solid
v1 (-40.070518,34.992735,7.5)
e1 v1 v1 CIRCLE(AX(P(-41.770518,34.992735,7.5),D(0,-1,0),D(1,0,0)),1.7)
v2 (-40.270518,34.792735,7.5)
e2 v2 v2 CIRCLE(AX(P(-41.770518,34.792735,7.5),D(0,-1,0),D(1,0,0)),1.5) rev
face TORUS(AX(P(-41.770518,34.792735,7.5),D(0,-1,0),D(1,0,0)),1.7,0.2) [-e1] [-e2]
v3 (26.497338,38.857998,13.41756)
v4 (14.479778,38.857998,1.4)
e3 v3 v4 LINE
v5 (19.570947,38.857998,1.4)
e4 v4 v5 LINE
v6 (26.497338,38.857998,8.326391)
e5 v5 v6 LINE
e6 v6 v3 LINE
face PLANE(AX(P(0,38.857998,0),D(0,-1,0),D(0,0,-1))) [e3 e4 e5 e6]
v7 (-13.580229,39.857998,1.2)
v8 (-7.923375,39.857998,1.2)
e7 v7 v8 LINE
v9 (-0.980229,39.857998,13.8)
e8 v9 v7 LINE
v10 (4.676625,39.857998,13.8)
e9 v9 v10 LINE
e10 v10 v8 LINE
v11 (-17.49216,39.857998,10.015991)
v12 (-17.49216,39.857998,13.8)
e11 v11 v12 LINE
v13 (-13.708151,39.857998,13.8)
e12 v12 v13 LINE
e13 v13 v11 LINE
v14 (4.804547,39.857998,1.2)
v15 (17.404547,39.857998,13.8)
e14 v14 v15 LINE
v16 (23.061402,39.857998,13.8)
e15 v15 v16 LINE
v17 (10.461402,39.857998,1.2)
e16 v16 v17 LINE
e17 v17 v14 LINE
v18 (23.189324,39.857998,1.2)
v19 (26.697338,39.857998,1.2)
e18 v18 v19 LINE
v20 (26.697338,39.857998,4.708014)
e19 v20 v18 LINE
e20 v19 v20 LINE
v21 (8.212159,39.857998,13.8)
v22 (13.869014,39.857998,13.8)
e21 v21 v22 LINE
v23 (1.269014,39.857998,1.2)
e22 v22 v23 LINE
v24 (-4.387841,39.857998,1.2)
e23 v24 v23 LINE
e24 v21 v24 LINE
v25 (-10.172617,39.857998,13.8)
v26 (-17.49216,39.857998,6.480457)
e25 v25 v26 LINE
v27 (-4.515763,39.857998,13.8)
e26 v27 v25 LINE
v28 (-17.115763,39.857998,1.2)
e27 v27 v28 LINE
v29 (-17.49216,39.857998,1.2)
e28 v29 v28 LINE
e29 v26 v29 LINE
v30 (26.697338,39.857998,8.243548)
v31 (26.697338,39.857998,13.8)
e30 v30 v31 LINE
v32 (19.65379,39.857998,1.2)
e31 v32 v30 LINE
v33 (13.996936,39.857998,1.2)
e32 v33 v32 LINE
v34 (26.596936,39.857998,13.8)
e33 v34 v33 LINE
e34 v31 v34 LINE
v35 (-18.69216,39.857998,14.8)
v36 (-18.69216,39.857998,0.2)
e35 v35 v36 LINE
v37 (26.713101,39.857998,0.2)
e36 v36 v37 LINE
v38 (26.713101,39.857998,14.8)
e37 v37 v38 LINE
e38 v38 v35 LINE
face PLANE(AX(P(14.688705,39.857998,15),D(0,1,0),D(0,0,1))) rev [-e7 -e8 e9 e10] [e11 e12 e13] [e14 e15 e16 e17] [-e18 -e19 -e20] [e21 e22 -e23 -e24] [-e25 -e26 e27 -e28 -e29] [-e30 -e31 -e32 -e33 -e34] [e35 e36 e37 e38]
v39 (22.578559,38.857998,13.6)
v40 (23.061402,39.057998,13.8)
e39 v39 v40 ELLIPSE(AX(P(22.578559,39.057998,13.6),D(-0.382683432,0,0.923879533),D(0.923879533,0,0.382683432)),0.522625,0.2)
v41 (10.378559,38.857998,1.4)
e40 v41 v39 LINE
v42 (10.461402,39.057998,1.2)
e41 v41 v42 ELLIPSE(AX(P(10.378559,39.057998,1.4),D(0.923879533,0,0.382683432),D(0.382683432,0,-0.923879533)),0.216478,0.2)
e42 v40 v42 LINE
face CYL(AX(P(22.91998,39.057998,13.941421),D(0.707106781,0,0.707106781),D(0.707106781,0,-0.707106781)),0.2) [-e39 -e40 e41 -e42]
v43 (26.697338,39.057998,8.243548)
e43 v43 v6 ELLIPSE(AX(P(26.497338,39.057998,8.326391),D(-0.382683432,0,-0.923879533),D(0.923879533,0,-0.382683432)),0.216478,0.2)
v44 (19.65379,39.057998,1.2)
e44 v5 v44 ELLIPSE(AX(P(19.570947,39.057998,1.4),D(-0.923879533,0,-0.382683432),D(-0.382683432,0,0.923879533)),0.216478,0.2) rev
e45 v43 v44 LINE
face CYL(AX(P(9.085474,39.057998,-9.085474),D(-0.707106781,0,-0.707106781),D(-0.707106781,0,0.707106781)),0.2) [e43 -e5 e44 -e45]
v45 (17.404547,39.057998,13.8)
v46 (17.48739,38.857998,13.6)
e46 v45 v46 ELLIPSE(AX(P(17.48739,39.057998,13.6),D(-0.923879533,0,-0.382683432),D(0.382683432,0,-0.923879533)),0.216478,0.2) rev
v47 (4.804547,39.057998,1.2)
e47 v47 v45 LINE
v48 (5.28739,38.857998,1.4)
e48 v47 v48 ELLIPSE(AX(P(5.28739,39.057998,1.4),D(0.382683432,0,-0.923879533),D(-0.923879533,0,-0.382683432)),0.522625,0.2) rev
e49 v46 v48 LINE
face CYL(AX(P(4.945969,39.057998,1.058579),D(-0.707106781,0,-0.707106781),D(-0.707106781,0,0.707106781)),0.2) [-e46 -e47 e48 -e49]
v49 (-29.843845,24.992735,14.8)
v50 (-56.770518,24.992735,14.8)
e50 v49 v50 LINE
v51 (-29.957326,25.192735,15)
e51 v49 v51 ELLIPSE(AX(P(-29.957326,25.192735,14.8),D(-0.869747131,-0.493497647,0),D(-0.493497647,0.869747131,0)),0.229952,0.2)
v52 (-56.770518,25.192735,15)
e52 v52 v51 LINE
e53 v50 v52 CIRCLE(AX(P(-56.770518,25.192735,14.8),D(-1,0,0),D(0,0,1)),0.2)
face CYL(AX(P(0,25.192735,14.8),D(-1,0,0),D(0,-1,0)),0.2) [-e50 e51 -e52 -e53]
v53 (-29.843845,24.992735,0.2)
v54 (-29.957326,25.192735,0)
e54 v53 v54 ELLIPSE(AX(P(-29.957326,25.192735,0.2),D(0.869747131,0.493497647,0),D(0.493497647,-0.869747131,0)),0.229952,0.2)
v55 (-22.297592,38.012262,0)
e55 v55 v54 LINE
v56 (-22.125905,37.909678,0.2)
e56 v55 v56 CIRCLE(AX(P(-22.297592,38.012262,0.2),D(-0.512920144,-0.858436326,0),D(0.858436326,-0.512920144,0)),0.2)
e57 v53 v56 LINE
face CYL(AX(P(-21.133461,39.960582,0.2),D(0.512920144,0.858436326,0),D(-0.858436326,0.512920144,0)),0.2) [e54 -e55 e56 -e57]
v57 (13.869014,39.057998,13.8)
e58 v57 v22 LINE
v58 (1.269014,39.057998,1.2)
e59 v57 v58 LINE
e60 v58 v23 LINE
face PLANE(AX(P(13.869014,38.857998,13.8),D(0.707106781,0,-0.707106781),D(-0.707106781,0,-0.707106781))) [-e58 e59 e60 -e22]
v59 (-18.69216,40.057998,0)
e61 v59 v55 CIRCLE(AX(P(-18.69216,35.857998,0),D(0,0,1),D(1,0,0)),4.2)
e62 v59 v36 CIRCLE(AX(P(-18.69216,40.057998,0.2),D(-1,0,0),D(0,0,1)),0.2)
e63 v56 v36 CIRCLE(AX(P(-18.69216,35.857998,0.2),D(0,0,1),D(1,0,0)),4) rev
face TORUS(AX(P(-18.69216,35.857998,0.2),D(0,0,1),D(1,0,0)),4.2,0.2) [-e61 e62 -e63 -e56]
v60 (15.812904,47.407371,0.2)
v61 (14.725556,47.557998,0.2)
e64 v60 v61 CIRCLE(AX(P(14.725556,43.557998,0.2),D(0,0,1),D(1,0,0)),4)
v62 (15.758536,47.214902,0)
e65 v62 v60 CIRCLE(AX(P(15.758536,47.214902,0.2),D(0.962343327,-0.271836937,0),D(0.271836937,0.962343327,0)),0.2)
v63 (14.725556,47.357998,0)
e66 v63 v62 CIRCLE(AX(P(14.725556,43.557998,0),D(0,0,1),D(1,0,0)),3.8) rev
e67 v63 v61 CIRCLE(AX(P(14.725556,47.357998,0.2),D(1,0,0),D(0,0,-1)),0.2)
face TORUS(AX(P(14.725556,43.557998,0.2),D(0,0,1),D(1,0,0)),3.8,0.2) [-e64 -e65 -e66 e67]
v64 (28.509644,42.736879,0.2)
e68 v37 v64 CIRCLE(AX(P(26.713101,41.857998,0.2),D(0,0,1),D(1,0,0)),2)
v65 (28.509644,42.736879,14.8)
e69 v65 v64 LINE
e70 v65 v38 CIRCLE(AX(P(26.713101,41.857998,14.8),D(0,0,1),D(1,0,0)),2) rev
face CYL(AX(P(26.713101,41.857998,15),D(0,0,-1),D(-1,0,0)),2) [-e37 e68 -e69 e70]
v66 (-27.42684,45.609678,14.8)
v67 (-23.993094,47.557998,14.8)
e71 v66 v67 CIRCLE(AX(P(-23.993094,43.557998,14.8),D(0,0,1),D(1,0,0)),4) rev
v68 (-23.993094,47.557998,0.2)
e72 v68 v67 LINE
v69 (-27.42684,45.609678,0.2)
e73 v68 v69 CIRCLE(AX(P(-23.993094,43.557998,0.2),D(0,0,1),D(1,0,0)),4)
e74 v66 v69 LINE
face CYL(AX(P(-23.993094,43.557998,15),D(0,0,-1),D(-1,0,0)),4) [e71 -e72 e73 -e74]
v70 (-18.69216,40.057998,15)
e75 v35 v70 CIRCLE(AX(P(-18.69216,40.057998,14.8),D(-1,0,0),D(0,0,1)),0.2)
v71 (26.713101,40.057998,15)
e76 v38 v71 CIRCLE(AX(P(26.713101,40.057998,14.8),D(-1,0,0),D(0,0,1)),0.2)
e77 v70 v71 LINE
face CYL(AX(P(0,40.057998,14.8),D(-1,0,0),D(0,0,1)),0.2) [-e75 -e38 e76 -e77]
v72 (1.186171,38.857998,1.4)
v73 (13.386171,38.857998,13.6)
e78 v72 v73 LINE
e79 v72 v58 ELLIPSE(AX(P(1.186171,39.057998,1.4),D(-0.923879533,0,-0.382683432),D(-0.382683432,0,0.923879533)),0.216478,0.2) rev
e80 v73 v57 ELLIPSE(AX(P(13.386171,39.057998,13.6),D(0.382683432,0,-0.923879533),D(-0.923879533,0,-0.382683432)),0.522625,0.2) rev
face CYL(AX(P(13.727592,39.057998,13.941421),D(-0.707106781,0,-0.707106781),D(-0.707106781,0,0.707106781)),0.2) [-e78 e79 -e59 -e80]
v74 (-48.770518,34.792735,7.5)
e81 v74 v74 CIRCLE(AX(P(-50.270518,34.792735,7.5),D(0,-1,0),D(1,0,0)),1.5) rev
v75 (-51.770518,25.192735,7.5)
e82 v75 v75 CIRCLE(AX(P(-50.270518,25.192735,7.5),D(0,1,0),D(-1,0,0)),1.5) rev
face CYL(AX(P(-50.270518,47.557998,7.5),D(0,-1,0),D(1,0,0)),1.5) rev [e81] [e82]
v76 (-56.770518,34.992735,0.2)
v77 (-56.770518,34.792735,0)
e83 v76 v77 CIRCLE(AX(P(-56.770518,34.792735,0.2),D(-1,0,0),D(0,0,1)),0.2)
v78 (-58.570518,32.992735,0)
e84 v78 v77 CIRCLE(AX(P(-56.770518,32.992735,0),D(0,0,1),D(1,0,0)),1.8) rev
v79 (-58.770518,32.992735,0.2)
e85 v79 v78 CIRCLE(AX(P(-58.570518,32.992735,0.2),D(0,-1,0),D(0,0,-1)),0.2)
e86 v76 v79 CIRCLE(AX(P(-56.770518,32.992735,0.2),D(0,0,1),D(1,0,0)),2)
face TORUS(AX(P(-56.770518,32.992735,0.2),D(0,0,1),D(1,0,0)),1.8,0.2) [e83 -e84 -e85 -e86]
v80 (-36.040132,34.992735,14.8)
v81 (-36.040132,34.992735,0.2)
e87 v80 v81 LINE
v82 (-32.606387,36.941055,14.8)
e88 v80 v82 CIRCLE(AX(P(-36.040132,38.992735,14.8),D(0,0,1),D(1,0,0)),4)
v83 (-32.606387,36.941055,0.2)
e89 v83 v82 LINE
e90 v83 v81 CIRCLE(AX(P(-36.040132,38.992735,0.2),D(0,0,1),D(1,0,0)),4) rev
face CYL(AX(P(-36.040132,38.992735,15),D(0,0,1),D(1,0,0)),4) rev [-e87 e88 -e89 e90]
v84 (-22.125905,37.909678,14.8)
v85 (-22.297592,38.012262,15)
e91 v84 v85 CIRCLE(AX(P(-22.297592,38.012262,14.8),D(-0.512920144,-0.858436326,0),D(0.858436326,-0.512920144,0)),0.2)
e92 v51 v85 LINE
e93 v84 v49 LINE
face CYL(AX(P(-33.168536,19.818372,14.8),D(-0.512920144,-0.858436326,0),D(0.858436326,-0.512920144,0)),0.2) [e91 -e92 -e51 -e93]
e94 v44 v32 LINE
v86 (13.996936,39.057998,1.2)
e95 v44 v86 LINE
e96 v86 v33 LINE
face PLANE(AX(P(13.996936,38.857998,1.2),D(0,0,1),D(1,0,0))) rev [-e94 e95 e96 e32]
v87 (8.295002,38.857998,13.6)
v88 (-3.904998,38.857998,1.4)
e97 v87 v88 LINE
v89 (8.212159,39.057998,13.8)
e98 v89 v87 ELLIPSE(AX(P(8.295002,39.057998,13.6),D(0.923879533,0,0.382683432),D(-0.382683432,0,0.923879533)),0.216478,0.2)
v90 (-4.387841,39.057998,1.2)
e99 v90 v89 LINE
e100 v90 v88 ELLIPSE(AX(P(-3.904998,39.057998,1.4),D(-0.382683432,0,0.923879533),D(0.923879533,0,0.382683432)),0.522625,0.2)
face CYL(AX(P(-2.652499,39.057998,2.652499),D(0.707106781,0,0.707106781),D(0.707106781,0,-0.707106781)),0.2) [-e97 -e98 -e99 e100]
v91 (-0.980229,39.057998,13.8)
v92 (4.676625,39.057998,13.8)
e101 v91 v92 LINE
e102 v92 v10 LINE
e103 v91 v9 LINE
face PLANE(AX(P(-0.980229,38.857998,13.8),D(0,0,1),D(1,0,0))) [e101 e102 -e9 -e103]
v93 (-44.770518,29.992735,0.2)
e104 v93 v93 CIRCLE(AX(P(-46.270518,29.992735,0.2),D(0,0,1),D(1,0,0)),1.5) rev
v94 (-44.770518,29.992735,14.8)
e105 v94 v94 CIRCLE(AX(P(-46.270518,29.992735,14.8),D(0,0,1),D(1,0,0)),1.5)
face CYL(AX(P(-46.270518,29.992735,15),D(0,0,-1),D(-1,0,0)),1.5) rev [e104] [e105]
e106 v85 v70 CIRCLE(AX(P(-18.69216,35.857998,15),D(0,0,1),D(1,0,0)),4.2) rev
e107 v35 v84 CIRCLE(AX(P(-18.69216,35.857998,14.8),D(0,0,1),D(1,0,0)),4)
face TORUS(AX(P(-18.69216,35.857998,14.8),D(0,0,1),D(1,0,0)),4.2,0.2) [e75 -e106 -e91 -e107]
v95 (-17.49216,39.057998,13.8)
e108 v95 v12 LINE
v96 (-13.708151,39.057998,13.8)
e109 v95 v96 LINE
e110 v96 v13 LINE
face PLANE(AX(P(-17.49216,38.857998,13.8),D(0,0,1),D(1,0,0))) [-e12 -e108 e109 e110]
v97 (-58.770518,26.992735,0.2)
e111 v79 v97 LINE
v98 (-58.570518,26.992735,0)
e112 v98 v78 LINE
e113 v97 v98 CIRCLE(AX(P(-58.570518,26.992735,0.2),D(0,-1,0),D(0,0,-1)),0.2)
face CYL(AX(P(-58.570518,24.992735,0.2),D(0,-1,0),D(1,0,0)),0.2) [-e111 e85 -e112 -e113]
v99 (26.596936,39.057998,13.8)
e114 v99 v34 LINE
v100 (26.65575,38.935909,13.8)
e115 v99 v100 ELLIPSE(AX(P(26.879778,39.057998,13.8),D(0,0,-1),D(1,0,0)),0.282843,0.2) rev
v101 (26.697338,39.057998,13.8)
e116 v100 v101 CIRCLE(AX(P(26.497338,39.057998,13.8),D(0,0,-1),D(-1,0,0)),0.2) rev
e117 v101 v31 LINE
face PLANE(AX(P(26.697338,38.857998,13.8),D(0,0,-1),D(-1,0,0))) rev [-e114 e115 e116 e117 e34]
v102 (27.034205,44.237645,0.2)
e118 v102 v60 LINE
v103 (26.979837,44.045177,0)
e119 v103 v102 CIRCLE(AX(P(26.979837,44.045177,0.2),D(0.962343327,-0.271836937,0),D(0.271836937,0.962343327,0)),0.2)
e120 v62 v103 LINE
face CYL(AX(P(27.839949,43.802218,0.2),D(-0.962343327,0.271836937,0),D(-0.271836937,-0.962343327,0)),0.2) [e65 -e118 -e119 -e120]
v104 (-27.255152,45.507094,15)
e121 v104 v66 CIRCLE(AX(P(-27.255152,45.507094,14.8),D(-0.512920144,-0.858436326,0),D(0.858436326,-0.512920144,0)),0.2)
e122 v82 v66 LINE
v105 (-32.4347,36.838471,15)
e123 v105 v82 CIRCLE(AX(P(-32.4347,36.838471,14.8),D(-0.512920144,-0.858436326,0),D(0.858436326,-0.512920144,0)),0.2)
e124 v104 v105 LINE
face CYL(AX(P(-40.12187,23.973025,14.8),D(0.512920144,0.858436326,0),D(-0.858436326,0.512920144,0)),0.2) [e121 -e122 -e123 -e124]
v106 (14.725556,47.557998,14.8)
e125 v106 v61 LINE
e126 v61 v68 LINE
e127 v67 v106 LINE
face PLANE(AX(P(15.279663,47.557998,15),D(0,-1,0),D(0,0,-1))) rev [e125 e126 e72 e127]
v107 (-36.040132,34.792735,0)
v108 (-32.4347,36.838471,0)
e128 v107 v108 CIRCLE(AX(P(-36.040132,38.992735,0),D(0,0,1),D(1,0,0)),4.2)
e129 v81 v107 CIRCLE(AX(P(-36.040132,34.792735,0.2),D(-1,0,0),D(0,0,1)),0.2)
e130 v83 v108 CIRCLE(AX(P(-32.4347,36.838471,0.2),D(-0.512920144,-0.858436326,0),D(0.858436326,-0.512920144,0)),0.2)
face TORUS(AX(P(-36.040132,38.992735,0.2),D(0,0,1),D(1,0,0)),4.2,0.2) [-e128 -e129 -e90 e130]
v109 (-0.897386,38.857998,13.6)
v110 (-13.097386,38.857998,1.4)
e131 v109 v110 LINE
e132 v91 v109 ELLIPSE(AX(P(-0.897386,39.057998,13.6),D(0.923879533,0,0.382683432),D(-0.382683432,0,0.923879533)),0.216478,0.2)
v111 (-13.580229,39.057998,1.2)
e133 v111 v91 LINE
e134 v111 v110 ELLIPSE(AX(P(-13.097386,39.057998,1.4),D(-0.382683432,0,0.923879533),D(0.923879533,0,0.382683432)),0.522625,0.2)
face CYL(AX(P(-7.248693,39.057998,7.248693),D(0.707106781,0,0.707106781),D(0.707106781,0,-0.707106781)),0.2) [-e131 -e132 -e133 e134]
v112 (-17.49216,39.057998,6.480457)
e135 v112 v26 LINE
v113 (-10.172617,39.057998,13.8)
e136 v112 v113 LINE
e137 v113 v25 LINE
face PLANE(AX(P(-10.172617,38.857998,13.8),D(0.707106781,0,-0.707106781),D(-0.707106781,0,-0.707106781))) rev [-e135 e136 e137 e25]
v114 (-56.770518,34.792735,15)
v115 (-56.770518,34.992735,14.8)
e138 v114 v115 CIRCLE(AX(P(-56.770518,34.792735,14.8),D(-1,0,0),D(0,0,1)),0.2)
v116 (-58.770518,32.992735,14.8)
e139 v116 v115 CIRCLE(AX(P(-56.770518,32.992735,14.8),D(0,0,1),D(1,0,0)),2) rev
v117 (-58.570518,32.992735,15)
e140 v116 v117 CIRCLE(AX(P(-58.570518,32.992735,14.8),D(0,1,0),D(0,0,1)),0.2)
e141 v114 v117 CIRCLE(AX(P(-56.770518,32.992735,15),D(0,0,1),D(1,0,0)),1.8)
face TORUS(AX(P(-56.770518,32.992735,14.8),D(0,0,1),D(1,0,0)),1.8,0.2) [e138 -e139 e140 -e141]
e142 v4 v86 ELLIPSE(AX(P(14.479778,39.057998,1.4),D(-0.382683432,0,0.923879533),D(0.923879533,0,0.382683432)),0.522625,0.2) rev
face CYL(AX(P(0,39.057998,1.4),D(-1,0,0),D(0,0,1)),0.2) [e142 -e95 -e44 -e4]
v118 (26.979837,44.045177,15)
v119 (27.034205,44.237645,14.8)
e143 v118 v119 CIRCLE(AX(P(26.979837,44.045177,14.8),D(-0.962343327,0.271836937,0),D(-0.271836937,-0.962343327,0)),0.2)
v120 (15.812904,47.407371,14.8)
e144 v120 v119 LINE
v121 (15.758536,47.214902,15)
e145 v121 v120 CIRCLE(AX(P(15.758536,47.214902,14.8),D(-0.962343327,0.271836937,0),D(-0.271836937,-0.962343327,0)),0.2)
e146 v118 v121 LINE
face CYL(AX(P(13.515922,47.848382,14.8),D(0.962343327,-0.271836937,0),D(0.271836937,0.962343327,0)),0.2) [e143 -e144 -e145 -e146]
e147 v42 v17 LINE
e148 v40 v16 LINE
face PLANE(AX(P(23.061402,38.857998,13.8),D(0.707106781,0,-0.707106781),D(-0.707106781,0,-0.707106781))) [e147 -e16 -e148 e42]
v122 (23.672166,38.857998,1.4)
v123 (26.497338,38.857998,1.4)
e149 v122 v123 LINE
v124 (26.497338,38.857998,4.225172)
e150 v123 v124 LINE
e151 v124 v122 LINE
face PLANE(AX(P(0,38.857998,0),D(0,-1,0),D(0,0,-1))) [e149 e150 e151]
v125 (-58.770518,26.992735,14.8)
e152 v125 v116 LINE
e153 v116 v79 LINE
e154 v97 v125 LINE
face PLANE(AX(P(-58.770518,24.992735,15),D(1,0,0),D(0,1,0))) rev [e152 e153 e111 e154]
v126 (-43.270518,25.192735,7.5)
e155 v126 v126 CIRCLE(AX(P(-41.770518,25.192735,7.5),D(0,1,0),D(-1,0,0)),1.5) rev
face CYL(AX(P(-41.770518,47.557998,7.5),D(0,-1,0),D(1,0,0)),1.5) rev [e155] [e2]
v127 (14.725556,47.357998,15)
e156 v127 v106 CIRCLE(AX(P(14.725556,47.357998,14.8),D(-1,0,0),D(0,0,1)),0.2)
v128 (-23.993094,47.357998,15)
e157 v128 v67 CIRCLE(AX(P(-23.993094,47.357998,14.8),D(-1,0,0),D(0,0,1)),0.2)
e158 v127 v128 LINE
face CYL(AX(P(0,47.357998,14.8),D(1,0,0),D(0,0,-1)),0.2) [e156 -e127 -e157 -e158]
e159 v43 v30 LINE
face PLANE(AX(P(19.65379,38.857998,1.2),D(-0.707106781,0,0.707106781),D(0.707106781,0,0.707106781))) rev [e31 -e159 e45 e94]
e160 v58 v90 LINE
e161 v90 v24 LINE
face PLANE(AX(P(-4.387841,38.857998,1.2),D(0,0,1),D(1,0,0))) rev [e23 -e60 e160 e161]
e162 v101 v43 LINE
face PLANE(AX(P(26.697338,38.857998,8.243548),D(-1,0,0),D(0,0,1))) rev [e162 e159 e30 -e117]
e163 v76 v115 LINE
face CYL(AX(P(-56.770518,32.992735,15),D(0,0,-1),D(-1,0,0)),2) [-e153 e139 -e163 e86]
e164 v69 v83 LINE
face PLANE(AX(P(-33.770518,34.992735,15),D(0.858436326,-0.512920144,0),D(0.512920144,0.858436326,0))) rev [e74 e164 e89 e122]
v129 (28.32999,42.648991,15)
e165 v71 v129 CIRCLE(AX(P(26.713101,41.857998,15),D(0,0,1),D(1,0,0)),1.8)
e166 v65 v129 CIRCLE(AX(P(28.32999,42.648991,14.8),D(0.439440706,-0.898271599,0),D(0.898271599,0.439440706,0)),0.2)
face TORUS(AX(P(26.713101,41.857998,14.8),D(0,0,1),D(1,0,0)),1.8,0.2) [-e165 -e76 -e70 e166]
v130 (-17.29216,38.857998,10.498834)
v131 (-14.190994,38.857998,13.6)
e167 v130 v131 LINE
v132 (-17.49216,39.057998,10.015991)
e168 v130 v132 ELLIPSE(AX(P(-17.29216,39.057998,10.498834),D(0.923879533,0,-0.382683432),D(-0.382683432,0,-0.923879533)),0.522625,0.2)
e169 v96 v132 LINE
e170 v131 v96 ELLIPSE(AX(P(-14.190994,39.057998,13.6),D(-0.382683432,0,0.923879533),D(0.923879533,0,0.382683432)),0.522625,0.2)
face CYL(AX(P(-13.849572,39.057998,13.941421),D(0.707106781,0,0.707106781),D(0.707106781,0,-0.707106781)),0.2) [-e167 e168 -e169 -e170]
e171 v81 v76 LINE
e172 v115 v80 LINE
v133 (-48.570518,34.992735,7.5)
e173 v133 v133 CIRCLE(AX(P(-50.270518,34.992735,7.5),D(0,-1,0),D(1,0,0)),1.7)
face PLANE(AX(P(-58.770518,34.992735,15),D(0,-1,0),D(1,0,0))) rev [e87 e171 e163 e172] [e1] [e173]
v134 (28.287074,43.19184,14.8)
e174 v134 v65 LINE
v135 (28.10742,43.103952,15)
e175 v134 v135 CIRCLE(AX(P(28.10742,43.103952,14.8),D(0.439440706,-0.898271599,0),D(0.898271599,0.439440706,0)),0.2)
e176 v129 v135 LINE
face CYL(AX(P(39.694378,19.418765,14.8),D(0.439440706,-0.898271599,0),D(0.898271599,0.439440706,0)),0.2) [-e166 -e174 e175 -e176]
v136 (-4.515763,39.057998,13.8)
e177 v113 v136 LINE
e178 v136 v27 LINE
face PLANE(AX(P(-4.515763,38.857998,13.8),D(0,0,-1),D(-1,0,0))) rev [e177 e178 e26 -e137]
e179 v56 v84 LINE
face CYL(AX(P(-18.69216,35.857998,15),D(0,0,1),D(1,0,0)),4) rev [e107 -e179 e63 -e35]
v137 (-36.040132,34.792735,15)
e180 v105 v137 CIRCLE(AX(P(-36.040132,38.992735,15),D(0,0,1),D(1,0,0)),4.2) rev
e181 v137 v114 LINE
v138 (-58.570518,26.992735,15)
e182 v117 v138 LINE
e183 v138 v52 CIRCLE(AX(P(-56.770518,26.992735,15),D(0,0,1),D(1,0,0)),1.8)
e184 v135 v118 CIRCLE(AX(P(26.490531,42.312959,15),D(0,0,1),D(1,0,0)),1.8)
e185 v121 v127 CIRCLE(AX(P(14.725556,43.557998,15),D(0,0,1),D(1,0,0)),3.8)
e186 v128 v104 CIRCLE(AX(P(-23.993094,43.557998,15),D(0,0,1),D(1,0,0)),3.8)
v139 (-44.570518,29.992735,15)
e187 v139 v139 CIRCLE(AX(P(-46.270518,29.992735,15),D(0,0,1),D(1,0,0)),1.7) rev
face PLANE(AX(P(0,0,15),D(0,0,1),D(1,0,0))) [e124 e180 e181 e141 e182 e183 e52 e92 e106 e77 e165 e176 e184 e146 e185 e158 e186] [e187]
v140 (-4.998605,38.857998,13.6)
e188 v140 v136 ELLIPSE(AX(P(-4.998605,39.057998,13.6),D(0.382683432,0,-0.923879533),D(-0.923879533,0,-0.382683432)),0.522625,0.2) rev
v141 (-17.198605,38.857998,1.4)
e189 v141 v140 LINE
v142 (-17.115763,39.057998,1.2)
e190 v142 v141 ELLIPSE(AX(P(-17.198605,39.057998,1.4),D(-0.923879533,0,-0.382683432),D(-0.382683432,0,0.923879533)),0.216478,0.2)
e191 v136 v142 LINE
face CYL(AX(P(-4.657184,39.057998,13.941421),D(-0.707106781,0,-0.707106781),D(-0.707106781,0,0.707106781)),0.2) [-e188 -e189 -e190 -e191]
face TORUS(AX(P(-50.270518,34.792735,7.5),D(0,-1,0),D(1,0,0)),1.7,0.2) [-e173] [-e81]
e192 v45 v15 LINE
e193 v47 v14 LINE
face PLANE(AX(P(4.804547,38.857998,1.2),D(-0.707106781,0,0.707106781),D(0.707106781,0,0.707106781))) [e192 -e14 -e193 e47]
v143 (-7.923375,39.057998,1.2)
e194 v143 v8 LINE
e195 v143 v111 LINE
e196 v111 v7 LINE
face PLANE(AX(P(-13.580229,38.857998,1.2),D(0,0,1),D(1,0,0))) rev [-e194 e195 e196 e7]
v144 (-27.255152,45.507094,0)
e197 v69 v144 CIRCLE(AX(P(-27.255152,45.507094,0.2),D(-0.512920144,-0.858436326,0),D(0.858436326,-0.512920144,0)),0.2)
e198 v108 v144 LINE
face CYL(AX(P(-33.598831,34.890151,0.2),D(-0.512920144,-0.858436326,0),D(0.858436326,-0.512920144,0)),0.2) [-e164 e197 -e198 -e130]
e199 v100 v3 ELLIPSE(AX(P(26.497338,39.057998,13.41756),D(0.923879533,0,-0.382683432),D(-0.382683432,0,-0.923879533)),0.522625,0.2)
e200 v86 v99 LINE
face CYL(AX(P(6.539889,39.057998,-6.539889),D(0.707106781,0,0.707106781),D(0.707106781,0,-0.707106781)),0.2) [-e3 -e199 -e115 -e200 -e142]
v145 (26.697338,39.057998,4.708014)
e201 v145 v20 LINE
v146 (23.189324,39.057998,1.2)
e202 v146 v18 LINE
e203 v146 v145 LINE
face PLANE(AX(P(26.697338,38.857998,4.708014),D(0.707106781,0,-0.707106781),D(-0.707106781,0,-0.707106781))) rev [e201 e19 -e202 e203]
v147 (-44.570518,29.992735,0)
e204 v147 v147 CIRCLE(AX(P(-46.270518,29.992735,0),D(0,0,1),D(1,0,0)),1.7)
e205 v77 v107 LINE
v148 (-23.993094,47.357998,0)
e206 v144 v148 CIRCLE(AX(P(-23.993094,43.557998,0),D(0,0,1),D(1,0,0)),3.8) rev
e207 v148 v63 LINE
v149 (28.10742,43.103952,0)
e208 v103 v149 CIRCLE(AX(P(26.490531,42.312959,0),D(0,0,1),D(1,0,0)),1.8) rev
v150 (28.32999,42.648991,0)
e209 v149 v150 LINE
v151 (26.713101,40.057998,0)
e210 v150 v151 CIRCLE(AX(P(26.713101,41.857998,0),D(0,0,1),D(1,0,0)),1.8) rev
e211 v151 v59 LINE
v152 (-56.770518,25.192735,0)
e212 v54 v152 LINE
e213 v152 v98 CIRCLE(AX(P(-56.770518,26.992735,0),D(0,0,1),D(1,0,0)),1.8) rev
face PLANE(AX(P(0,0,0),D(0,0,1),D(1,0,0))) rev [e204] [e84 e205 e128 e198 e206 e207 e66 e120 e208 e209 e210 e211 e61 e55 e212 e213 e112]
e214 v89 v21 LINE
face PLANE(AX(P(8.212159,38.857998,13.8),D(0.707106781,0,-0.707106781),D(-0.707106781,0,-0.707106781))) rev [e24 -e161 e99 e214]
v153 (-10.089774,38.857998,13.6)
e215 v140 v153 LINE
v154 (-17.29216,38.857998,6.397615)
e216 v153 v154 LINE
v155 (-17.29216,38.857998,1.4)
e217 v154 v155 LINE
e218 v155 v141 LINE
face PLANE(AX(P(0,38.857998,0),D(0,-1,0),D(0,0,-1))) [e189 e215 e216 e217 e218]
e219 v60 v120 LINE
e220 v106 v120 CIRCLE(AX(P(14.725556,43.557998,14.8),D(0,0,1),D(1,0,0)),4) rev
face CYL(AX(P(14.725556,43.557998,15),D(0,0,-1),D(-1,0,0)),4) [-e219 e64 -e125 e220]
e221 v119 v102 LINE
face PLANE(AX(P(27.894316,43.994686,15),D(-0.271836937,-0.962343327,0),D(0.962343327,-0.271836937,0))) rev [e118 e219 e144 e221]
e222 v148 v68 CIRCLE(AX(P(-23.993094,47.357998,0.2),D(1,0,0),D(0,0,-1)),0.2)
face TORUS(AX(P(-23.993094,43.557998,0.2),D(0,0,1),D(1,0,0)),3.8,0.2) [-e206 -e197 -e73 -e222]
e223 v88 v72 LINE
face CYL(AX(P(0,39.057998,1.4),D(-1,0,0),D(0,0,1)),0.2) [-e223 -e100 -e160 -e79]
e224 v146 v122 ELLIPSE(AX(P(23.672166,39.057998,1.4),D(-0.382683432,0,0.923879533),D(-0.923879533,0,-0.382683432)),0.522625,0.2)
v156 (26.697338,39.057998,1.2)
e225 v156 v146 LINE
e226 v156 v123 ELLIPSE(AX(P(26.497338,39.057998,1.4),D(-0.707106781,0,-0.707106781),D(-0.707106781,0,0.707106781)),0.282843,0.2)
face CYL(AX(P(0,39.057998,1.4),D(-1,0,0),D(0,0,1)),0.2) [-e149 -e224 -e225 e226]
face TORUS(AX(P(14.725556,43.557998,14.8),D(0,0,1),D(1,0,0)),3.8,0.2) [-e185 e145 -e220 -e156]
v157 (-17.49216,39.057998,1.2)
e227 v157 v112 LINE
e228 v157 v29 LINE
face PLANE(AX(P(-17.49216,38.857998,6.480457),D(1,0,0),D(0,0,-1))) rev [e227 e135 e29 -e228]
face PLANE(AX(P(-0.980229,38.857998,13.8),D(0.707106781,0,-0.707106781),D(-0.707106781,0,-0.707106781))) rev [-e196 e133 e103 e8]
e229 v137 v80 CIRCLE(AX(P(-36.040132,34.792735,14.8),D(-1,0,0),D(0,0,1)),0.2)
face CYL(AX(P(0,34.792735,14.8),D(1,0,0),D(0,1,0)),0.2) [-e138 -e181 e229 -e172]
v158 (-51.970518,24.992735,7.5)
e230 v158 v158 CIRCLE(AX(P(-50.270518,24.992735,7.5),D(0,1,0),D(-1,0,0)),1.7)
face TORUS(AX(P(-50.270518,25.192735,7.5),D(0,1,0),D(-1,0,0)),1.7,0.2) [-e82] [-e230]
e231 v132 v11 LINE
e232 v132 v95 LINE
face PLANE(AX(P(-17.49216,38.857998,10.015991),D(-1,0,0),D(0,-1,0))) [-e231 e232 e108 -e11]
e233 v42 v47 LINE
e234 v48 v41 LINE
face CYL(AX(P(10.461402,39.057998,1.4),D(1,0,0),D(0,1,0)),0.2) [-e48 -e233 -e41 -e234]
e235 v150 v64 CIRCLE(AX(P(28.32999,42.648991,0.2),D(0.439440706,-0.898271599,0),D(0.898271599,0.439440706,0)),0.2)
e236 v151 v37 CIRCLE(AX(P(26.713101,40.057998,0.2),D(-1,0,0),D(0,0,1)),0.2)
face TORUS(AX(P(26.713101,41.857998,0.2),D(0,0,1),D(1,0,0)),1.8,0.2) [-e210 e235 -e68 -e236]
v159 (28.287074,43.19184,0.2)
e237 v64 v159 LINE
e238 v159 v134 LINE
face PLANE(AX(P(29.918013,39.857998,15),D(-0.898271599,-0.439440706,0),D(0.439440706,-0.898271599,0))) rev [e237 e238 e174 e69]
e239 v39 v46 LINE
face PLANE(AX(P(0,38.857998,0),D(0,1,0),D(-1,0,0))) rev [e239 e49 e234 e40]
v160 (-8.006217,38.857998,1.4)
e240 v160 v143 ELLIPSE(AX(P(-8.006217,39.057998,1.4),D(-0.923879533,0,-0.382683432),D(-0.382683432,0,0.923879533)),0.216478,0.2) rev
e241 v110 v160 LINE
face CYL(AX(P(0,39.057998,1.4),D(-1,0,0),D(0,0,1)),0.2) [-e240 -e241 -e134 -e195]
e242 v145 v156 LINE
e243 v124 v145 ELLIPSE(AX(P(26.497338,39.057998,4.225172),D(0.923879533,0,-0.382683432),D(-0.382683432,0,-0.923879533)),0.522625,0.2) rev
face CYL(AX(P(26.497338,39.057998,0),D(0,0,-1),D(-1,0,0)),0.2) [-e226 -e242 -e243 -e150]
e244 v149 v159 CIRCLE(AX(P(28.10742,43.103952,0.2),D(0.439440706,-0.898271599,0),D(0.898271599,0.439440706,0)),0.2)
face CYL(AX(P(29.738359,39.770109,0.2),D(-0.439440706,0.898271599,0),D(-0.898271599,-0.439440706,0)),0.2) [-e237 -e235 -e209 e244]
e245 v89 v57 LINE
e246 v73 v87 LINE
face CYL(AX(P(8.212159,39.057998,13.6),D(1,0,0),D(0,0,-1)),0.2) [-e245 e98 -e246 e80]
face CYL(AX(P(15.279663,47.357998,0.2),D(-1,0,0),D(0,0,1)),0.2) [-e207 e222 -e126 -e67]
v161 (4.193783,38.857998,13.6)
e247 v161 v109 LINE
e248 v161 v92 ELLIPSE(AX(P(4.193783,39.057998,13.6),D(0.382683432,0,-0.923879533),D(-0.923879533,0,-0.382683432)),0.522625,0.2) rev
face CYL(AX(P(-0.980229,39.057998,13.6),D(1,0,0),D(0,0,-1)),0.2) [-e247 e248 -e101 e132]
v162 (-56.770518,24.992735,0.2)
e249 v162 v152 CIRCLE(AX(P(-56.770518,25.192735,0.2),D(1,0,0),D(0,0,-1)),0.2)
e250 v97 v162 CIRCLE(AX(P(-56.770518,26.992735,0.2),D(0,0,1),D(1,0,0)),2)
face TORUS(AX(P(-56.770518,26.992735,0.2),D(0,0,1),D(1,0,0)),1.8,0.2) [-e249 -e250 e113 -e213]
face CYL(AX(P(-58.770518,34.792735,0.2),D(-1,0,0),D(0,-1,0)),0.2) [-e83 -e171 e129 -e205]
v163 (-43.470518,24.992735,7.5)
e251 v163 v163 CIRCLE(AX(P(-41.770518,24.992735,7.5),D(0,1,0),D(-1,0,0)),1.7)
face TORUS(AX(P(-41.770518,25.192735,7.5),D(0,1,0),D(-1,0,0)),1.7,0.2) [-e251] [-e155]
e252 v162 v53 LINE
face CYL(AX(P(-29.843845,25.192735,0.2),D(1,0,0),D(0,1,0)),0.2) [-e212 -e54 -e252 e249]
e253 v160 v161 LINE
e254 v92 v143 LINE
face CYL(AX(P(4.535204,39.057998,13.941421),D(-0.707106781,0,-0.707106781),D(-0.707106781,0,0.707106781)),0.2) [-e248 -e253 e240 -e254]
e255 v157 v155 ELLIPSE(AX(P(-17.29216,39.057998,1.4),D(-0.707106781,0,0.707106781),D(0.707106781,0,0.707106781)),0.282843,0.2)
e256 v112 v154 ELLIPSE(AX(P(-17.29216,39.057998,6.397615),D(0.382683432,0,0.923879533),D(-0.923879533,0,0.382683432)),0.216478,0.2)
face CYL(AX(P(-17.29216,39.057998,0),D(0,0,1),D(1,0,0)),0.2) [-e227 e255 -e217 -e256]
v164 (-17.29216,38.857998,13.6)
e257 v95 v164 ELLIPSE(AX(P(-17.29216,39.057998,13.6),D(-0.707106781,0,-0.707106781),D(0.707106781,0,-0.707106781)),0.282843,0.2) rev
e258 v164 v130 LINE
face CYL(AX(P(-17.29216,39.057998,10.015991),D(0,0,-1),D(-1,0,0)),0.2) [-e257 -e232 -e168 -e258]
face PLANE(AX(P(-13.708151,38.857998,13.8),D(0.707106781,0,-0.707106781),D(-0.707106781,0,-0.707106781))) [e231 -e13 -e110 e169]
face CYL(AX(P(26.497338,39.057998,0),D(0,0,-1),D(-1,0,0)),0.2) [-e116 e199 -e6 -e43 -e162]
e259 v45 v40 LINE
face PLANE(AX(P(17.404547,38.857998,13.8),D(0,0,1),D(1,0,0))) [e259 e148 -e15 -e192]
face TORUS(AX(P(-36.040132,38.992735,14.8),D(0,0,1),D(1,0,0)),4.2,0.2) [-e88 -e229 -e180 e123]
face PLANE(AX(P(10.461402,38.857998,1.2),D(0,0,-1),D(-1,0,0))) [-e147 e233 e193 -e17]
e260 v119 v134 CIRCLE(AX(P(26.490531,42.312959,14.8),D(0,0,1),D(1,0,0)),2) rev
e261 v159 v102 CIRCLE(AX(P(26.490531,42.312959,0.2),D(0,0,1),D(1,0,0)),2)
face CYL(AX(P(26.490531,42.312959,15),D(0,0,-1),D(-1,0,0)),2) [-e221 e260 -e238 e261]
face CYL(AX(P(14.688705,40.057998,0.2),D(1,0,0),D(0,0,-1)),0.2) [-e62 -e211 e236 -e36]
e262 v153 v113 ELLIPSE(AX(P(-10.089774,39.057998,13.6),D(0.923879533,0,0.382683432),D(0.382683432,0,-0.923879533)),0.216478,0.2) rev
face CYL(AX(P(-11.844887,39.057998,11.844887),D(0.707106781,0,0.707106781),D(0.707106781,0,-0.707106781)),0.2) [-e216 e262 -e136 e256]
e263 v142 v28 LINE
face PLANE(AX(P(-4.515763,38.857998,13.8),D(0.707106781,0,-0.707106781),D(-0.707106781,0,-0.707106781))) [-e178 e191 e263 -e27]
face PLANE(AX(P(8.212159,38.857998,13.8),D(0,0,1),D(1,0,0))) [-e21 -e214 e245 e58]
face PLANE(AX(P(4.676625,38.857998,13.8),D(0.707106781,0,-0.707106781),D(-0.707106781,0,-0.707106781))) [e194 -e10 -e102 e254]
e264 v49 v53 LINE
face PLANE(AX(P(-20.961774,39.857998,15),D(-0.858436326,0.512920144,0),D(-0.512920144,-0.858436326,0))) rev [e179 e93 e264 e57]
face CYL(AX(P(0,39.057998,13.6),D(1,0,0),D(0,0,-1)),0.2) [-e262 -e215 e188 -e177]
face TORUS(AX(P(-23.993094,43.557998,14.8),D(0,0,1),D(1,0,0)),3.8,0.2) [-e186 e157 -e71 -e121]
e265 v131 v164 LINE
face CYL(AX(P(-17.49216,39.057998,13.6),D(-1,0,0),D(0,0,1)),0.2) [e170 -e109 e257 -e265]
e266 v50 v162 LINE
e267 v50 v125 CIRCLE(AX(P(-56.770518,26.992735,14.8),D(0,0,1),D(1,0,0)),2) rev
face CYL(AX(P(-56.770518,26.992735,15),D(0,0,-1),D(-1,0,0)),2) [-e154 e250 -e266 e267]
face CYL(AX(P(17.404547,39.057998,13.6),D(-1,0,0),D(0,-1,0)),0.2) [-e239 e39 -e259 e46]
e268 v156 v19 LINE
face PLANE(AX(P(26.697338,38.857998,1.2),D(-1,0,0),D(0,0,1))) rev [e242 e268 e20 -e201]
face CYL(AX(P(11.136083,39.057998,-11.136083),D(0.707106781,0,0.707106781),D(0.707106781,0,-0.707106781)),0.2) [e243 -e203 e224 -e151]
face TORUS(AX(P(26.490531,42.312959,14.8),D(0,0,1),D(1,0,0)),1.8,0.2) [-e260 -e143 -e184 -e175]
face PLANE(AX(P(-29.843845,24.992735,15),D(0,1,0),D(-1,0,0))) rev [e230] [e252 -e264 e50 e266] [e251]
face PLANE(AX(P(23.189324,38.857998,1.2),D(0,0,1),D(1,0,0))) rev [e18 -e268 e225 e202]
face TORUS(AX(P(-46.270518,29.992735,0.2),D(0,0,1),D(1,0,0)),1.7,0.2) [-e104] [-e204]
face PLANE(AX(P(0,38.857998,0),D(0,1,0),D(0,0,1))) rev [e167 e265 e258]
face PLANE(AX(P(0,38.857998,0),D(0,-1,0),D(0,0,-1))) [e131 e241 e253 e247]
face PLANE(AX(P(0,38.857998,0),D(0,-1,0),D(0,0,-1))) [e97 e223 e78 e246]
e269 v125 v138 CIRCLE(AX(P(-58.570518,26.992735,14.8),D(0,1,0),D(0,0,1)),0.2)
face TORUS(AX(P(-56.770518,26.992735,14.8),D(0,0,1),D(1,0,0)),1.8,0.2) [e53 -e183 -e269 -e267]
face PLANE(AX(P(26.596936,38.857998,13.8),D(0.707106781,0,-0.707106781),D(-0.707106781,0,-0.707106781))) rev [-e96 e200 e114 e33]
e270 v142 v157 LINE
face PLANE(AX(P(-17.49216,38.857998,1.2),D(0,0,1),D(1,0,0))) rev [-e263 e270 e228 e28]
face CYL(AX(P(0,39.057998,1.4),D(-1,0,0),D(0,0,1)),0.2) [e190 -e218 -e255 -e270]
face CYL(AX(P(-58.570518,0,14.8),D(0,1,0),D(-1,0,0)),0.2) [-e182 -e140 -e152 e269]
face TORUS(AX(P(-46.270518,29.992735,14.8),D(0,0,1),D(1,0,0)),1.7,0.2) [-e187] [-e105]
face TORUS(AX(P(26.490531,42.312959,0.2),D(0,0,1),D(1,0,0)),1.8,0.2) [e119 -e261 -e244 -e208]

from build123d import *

# Parameters (mm, degrees)
ESQUISSE1_R             = 1.5
BOSS_EXTRU_1_DEPTH      = 15
CONG_1_R                = 2
CONG_3_R                = 4
CONG_5_R                = 4
CONG_6_R                = 2
ESQUISSE2_R             = 1.5
ENL_V_MAT_EXTRU_2_DEPTH = 65.716032438
CONG_8_R                = 0.2
BOSS_EXTRU_2_DEPTH      = 1
CONG_10_R               = 0.2
CONG_11_R               = 0.2
CONG_12_R               = 0.2


with BuildPart() as part:
    # Esquisse1 → Boss.-Extru.1 (new body)
    with BuildSketch(Plane.XY):
        Polygon((-20.961773966, 39.857997612), (14.688705186, 39.857997612), (29.918012986, 39.857997612), (27.8943161, 43.99468639), (15.279662568, 47.557997612), (-26.262708646, 47.557997612), (-33.770517971, 34.992735109), (-58.770517971, 34.992735109), (-58.770517971, 24.992735109), (-29.843845186, 24.992735109), align=None)
        with Locations((-46.270517971, 29.992735109)):
            Circle(ESQUISSE1_R, mode=Mode.SUBTRACT)
    extrude(amount=BOSS_EXTRU_1_DEPTH)

    # Congé1
    cong_1_edges = [part.edges().sort_by_distance(p)[0] for p in [
        (27.8943161, 43.99468639, 7.5),
        (29.918012986, 39.857997612, 7.5),
    ]]
    fillet(cong_1_edges, radius=CONG_1_R)

    # Congé3
    cong_3_edges = [part.edges().sort_by_distance(p)[0] for p in [
        (-20.961773966, 39.857997612, 7.5),
    ]]
    fillet(cong_3_edges, radius=CONG_3_R)

    # Congé5
    cong_5_edges = [part.edges().sort_by_distance(p)[0] for p in [
        (-26.262708646, 47.557997612, 7.5),
        (15.279662568, 47.557997612, 7.5),
        (-33.770517971, 34.992735109, 7.5),
    ]]
    fillet(cong_5_edges, radius=CONG_5_R)

    # Congé6
    cong_6_edges = [part.edges().sort_by_distance(p)[0] for p in [
        (-58.770517971, 24.992735109, 7.5),
        (-58.770517971, 34.992735109, 7.5),
    ]]
    fillet(cong_6_edges, radius=CONG_6_R)

    # Esquisse2 → Enlèv. mat.-Extru.2 (cut, through all)
    with BuildSketch(Plane.XZ.offset(-24.992735109)):
        with Locations((-50.270517971, 7.5)):
            Circle(ESQUISSE2_R)
        with Locations((-41.770517971, 7.5)):
            Circle(ESQUISSE2_R)
    extrude(amount=-ENL_V_MAT_EXTRU_2_DEPTH, mode=Mode.SUBTRACT)

    # Congé8
    cong_8_edges = [part.edges().sort_by_distance(p)[0] for p in [
        (-51.770517971, 34.992735109, 7.5),
        (-51.770517971, 24.992735109, 7.5),
        (-43.270517971, 34.992735109, 7.5),
        (-43.270517971, 24.992735109, 7.5),
    ]]
    fillet(cong_8_edges, radius=CONG_8_R)

    # Esquisse3 → Boss.-Extru.2 (add)
    with BuildSketch(Plane.XZ.offset(-39.857997612)):
        Polygon((-4.51576278, 13.8), (-10.17261703, 13.8), (-17.492159594, 6.480457436), (-17.492159594, 1.2), (-17.11576278, 1.2), align=None)
        Polygon((-0.980228874, 13.8), (4.676625375, 13.8), (-7.923374625, 1.2), (-13.580228874, 1.2), align=None)
        Polygon((8.212159281, 13.8), (13.869013531, 13.8), (1.269013531, 1.2), (-4.387840719, 1.2), align=None)
        Polygon((17.404547437, 13.8), (23.061401686, 13.8), (10.461401686, 1.2), (4.804547437, 1.2), align=None)
        Polygon((26.596935592, 13.8), (13.996935592, 1.2), (19.653789841, 1.2), (26.69733819, 8.243548348), (26.69733819, 13.8), align=None)
        Polygon((26.69733819, 4.708014442), (23.189323747, 1.2), (26.69733819, 1.2), align=None)
        Polygon((-13.708150936, 13.8), (-17.492159594, 10.015991342), (-17.492159594, 13.8), align=None)
    extrude(amount=BOSS_EXTRU_2_DEPTH)

    # Congé10
    cong_10_edges = [part.edges().sort_by_distance(p)[0] for p in [
        (-47.770517971, 29.992735109, 0),
        (-47.770517971, 29.992735109, 15),
    ]]
    fillet(cong_10_edges, radius=CONG_10_R)

    # Congé11
    cong_11_edges = [part.edges().sort_by_distance(p)[0] for p in [
        (-25.984875042, 31.451206648, 0),
        (-25.984875042, 31.451206648, 15),
        (28.39835911, 42.964359626, 0),
        (28.39835911, 42.964359626, 15),
        (21.423554114, 45.822508196, 0),
        (27.772163037, 43.848347647, 0),
        (28.409827678, 40.799168737, 0),
        (21.423554114, 45.822508196, 15),
        (27.772163037, 43.848347647, 15),
        (28.409827678, 40.799168737, 15),
        (4.010470704, 39.857997612, 0),
        (4.010470704, 39.857997612, 15),
        (-20.666150183, 39.336986136, 0),
        (-20.666150183, 39.336986136, 15),
        (-46.405325158, 34.992735109, 0),
        (-46.405325158, 34.992735109, 15),
        (-30.016613309, 41.27536636, 0),
        (-30.016613309, 41.27536636, 15),
        (-4.633769244, 47.557997612, 0),
        (-4.633769244, 47.557997612, 15),
        (-25.967084863, 47.036986136, 0),
        (15.274421325, 47.520161998, 0),
        (-25.967084863, 47.036986136, 15),
        (15.274421325, 47.520161998, 15),
        (-34.066141755, 35.513746584, 0),
        (-34.066141755, 35.513746584, 15),
        (-43.307181579, 24.992735109, 0),
        (-43.307181579, 24.992735109, 15),
        (-58.770517971, 29.992735109, 0),
        (-58.184731534, 34.406948671, 0),
        (-58.184731534, 25.578521546, 0),
        (-58.770517971, 29.992735109, 15),
        (-58.184731534, 34.406948671, 15),
        (-58.184731534, 25.578521546, 15),
    ]]
    fillet(cong_11_edges, radius=CONG_11_R)

    # Congé12
    # the kernel refuses this fillet: 0.2 mm, written as the material it takes off along each edge
    with BuildSketch(Plane(origin=(7.712159281, 38.857997612, 13.8), x_dir=(0, 1, 0), z_dir=(1, 0, 0)), Plane(origin=(-1.480228874, 38.857997612, 13.8), x_dir=(0, 1, 0), z_dir=(1, 0, 0)), Plane(origin=(16.904547437, 38.857997612, 13.8), x_dir=(0, 1, 0), z_dir=(1, 0, 0)), Plane(origin=(10.961401686, 38.857997612, 1.2), x_dir=(0, 1, 0), z_dir=(-1, 0, 0)), Plane(origin=(1.769013531, 38.857997612, 1.2), x_dir=(0, 1, 0), z_dir=(-1, 0, 0)), Plane(origin=(-7.423374625, 38.857997612, 1.2), x_dir=(0, 1, 0), z_dir=(-1, 0, 0))) as cong_12_piece_1:
        with BuildLine():
            CenterArc((CONG_12_R, -CONG_12_R), CONG_12_R, 90, 90)
            Line((0, -CONG_12_R), (0, 0))
            Line((0, 0), (CONG_12_R, 0))
        make_face()
    extrude(amount=6.656854249, mode=Mode.SUBTRACT)
    with BuildSketch(Plane(origin=(14.222566921, 38.857997612, 14.153553391), x_dir=(0, 1, 0), z_dir=(-0.7071067811865435, 0, -0.7071067811865516)), Plane(origin=(5.030178766, 38.857997612, 14.153553391), x_dir=(0, 1, 0), z_dir=(-0.7071067811865472, 0, -0.7071067811865479)), Plane(origin=(23.414955077, 38.857997612, 14.153553391), x_dir=(0, 1, 0), z_dir=(-0.7071067811865432, 0, -0.7071067811865519)), Plane(origin=(4.450994046, 38.857997612, 0.846446609), x_dir=(0, 1, 0), z_dir=(0.7071067811865431, 0, 0.7071067811865519)), Plane(origin=(-4.741394109, 38.857997612, 0.846446609), x_dir=(0, 1, 0), z_dir=(0.707106781186541, 0, 0.707106781186554)), Plane(origin=(-13.933782265, 38.857997612, 0.846446609), x_dir=(0, 1, 0), z_dir=(0.7071067811865476, 0, 0.7071067811865475))) as cong_12_piece_2:
        with BuildLine():
            CenterArc((CONG_12_R, -CONG_12_R), CONG_12_R, 90, 90)
            Line((0, -CONG_12_R), (0, 0))
            Line((0, 0), (CONG_12_R, 0))
        make_face()
    extrude(amount=18.819090886, mode=Mode.SUBTRACT)
    with BuildSketch(Plane(origin=(19.300236451, 38.857997612, 0.846446609), x_dir=(0, 1, 0), z_dir=(0.7071067811865434, 0, 0.7071067811865518))) as cong_12_piece_3:
        with BuildLine():
            CenterArc((CONG_12_R, CONG_12_R), CONG_12_R, 180, 90)
            Line((0, CONG_12_R), (0, 0))
            Line((0, 0), (CONG_12_R, 0))
        make_face()
    extrude(amount=10.961081601, mode=Mode.SUBTRACT)
    with BuildSketch(Plane(origin=(13.496935592, 38.857997612, 1.2), x_dir=(0, 1, 0), z_dir=(1, 0, 0)), Plane(origin=(-4.01576278, 38.857997612, 13.8), x_dir=(0, 1, 0), z_dir=(-1, 0, 0))) as cong_12_piece_4:
        with BuildLine():
            CenterArc((CONG_12_R, CONG_12_R), CONG_12_R, 180, 90)
            Line((0, CONG_12_R), (0, 0))
            Line((0, 0), (CONG_12_R, 0))
        make_face()
    extrude(amount=6.656854249, mode=Mode.SUBTRACT)
    with BuildSketch(Plane(origin=(26.950488983, 38.857997612, 14.153553391), x_dir=(0, 1, 0), z_dir=(-0.7071067811865431, 0, -0.7071067811865519)), Plane(origin=(-17.469316171, 38.857997612, 0.846446609), x_dir=(0, 1, 0), z_dir=(0.7071067811865476, 0, 0.7071067811865475))) as cong_12_piece_5:
        with BuildLine():
            CenterArc((CONG_12_R, CONG_12_R), CONG_12_R, 180, 90)
            Line((0, CONG_12_R), (0, 0))
            Line((0, 0), (CONG_12_R, 0))
        make_face()
    extrude(amount=18.819090886, mode=Mode.SUBTRACT)
    with BuildSketch(Plane(origin=(26.69733819, 38.857997612, 7.743548348), x_dir=(0, 1, 0), z_dir=(0, 0, 1))) as cong_12_piece_6:
        with BuildLine():
            CenterArc((CONG_12_R, CONG_12_R), CONG_12_R, 180, 90)
            Line((0, CONG_12_R), (0, 0))
            Line((0, 0), (CONG_12_R, 0))
        make_face()
    extrude(amount=6.556451652, mode=Mode.SUBTRACT)
    with BuildSketch(Plane(origin=(27.05089158, 38.857997612, 5.061567833), x_dir=(0, 1, 0), z_dir=(-0.707106781186543, 0, -0.7071067811865521))) as cong_12_piece_7:
        with BuildLine():
            CenterArc((CONG_12_R, CONG_12_R), CONG_12_R, 180, 90)
            Line((0, CONG_12_R), (0, 0))
            Line((0, 0), (CONG_12_R, 0))
        make_face()
    extrude(amount=5.961081601, mode=Mode.SUBTRACT)
    with BuildSketch(Plane(origin=(26.69733819, 38.857997612, 0.7), x_dir=(0, 1, 0), z_dir=(0, 0, 1)), Plane(origin=(22.689323747, 38.857997612, 1.2), x_dir=(0, 1, 0), z_dir=(1, 0, 0))) as cong_12_piece_8:
        with BuildLine():
            CenterArc((CONG_12_R, CONG_12_R), CONG_12_R, 180, 90)
            Line((0, CONG_12_R), (0, 0))
            Line((0, 0), (CONG_12_R, 0))
        make_face()
    extrude(amount=4.508014442, mode=Mode.SUBTRACT)
    with BuildSketch(Plane(origin=(-17.992159594, 38.857997612, 13.8), x_dir=(0, 1, 0), z_dir=(1, 0, 0)), Plane(origin=(-17.492159594, 38.857997612, 9.515991342), x_dir=(0, 1, 0), z_dir=(0, 0, 1))) as cong_12_piece_9:
        with BuildLine():
            CenterArc((CONG_12_R, -CONG_12_R), CONG_12_R, 90, 90)
            Line((0, -CONG_12_R), (0, 0))
            Line((0, 0), (CONG_12_R, 0))
        make_face()
    extrude(amount=4.784008658, mode=Mode.SUBTRACT)
    with BuildSketch(Plane(origin=(-13.354597545, 38.857997612, 14.153553391), x_dir=(0, 1, 0), z_dir=(-0.7071067811865476, 0, -0.7071067811865476))) as cong_12_piece_10:
        with BuildLine():
            CenterArc((CONG_12_R, -CONG_12_R), CONG_12_R, 90, 90)
            Line((0, -CONG_12_R), (0, 0))
            Line((0, 0), (CONG_12_R, 0))
        make_face()
    extrude(amount=6.351396364, mode=Mode.SUBTRACT)
    with BuildSketch(Plane(origin=(-9.819063639, 38.857997612, 14.153553391), x_dir=(0, 1, 0), z_dir=(-0.7071067811865476, 0, -0.7071067811865476))) as cong_12_piece_11:
        with BuildLine():
            CenterArc((CONG_12_R, CONG_12_R), CONG_12_R, 180, 90)
            Line((0, CONG_12_R), (0, 0))
            Line((0, 0), (CONG_12_R, 0))
        make_face()
    extrude(amount=11.351396364, mode=Mode.SUBTRACT)
    with BuildSketch(Plane(origin=(-17.992159594, 38.857997612, 1.2), x_dir=(0, 1, 0), z_dir=(1, 0, 0))) as cong_12_piece_12:
        with BuildLine():
            CenterArc((CONG_12_R, CONG_12_R), CONG_12_R, 180, 90)
            Line((0, CONG_12_R), (0, 0))
            Line((0, 0), (CONG_12_R, 0))
        make_face()
    extrude(amount=1.376396813, mode=Mode.SUBTRACT)
    with BuildSketch(Plane(origin=(-17.492159594, 38.857997612, 6.980457436), x_dir=(0, 1, 0), z_dir=(0, 0, -1))) as cong_12_piece_13:
        with BuildLine():
            CenterArc((CONG_12_R, CONG_12_R), CONG_12_R, 180, 90)
            Line((0, CONG_12_R), (0, 0))
            Line((0, 0), (CONG_12_R, 0))
        make_face()
    extrude(amount=6.280457436, mode=Mode.SUBTRACT)


solid = part.part
